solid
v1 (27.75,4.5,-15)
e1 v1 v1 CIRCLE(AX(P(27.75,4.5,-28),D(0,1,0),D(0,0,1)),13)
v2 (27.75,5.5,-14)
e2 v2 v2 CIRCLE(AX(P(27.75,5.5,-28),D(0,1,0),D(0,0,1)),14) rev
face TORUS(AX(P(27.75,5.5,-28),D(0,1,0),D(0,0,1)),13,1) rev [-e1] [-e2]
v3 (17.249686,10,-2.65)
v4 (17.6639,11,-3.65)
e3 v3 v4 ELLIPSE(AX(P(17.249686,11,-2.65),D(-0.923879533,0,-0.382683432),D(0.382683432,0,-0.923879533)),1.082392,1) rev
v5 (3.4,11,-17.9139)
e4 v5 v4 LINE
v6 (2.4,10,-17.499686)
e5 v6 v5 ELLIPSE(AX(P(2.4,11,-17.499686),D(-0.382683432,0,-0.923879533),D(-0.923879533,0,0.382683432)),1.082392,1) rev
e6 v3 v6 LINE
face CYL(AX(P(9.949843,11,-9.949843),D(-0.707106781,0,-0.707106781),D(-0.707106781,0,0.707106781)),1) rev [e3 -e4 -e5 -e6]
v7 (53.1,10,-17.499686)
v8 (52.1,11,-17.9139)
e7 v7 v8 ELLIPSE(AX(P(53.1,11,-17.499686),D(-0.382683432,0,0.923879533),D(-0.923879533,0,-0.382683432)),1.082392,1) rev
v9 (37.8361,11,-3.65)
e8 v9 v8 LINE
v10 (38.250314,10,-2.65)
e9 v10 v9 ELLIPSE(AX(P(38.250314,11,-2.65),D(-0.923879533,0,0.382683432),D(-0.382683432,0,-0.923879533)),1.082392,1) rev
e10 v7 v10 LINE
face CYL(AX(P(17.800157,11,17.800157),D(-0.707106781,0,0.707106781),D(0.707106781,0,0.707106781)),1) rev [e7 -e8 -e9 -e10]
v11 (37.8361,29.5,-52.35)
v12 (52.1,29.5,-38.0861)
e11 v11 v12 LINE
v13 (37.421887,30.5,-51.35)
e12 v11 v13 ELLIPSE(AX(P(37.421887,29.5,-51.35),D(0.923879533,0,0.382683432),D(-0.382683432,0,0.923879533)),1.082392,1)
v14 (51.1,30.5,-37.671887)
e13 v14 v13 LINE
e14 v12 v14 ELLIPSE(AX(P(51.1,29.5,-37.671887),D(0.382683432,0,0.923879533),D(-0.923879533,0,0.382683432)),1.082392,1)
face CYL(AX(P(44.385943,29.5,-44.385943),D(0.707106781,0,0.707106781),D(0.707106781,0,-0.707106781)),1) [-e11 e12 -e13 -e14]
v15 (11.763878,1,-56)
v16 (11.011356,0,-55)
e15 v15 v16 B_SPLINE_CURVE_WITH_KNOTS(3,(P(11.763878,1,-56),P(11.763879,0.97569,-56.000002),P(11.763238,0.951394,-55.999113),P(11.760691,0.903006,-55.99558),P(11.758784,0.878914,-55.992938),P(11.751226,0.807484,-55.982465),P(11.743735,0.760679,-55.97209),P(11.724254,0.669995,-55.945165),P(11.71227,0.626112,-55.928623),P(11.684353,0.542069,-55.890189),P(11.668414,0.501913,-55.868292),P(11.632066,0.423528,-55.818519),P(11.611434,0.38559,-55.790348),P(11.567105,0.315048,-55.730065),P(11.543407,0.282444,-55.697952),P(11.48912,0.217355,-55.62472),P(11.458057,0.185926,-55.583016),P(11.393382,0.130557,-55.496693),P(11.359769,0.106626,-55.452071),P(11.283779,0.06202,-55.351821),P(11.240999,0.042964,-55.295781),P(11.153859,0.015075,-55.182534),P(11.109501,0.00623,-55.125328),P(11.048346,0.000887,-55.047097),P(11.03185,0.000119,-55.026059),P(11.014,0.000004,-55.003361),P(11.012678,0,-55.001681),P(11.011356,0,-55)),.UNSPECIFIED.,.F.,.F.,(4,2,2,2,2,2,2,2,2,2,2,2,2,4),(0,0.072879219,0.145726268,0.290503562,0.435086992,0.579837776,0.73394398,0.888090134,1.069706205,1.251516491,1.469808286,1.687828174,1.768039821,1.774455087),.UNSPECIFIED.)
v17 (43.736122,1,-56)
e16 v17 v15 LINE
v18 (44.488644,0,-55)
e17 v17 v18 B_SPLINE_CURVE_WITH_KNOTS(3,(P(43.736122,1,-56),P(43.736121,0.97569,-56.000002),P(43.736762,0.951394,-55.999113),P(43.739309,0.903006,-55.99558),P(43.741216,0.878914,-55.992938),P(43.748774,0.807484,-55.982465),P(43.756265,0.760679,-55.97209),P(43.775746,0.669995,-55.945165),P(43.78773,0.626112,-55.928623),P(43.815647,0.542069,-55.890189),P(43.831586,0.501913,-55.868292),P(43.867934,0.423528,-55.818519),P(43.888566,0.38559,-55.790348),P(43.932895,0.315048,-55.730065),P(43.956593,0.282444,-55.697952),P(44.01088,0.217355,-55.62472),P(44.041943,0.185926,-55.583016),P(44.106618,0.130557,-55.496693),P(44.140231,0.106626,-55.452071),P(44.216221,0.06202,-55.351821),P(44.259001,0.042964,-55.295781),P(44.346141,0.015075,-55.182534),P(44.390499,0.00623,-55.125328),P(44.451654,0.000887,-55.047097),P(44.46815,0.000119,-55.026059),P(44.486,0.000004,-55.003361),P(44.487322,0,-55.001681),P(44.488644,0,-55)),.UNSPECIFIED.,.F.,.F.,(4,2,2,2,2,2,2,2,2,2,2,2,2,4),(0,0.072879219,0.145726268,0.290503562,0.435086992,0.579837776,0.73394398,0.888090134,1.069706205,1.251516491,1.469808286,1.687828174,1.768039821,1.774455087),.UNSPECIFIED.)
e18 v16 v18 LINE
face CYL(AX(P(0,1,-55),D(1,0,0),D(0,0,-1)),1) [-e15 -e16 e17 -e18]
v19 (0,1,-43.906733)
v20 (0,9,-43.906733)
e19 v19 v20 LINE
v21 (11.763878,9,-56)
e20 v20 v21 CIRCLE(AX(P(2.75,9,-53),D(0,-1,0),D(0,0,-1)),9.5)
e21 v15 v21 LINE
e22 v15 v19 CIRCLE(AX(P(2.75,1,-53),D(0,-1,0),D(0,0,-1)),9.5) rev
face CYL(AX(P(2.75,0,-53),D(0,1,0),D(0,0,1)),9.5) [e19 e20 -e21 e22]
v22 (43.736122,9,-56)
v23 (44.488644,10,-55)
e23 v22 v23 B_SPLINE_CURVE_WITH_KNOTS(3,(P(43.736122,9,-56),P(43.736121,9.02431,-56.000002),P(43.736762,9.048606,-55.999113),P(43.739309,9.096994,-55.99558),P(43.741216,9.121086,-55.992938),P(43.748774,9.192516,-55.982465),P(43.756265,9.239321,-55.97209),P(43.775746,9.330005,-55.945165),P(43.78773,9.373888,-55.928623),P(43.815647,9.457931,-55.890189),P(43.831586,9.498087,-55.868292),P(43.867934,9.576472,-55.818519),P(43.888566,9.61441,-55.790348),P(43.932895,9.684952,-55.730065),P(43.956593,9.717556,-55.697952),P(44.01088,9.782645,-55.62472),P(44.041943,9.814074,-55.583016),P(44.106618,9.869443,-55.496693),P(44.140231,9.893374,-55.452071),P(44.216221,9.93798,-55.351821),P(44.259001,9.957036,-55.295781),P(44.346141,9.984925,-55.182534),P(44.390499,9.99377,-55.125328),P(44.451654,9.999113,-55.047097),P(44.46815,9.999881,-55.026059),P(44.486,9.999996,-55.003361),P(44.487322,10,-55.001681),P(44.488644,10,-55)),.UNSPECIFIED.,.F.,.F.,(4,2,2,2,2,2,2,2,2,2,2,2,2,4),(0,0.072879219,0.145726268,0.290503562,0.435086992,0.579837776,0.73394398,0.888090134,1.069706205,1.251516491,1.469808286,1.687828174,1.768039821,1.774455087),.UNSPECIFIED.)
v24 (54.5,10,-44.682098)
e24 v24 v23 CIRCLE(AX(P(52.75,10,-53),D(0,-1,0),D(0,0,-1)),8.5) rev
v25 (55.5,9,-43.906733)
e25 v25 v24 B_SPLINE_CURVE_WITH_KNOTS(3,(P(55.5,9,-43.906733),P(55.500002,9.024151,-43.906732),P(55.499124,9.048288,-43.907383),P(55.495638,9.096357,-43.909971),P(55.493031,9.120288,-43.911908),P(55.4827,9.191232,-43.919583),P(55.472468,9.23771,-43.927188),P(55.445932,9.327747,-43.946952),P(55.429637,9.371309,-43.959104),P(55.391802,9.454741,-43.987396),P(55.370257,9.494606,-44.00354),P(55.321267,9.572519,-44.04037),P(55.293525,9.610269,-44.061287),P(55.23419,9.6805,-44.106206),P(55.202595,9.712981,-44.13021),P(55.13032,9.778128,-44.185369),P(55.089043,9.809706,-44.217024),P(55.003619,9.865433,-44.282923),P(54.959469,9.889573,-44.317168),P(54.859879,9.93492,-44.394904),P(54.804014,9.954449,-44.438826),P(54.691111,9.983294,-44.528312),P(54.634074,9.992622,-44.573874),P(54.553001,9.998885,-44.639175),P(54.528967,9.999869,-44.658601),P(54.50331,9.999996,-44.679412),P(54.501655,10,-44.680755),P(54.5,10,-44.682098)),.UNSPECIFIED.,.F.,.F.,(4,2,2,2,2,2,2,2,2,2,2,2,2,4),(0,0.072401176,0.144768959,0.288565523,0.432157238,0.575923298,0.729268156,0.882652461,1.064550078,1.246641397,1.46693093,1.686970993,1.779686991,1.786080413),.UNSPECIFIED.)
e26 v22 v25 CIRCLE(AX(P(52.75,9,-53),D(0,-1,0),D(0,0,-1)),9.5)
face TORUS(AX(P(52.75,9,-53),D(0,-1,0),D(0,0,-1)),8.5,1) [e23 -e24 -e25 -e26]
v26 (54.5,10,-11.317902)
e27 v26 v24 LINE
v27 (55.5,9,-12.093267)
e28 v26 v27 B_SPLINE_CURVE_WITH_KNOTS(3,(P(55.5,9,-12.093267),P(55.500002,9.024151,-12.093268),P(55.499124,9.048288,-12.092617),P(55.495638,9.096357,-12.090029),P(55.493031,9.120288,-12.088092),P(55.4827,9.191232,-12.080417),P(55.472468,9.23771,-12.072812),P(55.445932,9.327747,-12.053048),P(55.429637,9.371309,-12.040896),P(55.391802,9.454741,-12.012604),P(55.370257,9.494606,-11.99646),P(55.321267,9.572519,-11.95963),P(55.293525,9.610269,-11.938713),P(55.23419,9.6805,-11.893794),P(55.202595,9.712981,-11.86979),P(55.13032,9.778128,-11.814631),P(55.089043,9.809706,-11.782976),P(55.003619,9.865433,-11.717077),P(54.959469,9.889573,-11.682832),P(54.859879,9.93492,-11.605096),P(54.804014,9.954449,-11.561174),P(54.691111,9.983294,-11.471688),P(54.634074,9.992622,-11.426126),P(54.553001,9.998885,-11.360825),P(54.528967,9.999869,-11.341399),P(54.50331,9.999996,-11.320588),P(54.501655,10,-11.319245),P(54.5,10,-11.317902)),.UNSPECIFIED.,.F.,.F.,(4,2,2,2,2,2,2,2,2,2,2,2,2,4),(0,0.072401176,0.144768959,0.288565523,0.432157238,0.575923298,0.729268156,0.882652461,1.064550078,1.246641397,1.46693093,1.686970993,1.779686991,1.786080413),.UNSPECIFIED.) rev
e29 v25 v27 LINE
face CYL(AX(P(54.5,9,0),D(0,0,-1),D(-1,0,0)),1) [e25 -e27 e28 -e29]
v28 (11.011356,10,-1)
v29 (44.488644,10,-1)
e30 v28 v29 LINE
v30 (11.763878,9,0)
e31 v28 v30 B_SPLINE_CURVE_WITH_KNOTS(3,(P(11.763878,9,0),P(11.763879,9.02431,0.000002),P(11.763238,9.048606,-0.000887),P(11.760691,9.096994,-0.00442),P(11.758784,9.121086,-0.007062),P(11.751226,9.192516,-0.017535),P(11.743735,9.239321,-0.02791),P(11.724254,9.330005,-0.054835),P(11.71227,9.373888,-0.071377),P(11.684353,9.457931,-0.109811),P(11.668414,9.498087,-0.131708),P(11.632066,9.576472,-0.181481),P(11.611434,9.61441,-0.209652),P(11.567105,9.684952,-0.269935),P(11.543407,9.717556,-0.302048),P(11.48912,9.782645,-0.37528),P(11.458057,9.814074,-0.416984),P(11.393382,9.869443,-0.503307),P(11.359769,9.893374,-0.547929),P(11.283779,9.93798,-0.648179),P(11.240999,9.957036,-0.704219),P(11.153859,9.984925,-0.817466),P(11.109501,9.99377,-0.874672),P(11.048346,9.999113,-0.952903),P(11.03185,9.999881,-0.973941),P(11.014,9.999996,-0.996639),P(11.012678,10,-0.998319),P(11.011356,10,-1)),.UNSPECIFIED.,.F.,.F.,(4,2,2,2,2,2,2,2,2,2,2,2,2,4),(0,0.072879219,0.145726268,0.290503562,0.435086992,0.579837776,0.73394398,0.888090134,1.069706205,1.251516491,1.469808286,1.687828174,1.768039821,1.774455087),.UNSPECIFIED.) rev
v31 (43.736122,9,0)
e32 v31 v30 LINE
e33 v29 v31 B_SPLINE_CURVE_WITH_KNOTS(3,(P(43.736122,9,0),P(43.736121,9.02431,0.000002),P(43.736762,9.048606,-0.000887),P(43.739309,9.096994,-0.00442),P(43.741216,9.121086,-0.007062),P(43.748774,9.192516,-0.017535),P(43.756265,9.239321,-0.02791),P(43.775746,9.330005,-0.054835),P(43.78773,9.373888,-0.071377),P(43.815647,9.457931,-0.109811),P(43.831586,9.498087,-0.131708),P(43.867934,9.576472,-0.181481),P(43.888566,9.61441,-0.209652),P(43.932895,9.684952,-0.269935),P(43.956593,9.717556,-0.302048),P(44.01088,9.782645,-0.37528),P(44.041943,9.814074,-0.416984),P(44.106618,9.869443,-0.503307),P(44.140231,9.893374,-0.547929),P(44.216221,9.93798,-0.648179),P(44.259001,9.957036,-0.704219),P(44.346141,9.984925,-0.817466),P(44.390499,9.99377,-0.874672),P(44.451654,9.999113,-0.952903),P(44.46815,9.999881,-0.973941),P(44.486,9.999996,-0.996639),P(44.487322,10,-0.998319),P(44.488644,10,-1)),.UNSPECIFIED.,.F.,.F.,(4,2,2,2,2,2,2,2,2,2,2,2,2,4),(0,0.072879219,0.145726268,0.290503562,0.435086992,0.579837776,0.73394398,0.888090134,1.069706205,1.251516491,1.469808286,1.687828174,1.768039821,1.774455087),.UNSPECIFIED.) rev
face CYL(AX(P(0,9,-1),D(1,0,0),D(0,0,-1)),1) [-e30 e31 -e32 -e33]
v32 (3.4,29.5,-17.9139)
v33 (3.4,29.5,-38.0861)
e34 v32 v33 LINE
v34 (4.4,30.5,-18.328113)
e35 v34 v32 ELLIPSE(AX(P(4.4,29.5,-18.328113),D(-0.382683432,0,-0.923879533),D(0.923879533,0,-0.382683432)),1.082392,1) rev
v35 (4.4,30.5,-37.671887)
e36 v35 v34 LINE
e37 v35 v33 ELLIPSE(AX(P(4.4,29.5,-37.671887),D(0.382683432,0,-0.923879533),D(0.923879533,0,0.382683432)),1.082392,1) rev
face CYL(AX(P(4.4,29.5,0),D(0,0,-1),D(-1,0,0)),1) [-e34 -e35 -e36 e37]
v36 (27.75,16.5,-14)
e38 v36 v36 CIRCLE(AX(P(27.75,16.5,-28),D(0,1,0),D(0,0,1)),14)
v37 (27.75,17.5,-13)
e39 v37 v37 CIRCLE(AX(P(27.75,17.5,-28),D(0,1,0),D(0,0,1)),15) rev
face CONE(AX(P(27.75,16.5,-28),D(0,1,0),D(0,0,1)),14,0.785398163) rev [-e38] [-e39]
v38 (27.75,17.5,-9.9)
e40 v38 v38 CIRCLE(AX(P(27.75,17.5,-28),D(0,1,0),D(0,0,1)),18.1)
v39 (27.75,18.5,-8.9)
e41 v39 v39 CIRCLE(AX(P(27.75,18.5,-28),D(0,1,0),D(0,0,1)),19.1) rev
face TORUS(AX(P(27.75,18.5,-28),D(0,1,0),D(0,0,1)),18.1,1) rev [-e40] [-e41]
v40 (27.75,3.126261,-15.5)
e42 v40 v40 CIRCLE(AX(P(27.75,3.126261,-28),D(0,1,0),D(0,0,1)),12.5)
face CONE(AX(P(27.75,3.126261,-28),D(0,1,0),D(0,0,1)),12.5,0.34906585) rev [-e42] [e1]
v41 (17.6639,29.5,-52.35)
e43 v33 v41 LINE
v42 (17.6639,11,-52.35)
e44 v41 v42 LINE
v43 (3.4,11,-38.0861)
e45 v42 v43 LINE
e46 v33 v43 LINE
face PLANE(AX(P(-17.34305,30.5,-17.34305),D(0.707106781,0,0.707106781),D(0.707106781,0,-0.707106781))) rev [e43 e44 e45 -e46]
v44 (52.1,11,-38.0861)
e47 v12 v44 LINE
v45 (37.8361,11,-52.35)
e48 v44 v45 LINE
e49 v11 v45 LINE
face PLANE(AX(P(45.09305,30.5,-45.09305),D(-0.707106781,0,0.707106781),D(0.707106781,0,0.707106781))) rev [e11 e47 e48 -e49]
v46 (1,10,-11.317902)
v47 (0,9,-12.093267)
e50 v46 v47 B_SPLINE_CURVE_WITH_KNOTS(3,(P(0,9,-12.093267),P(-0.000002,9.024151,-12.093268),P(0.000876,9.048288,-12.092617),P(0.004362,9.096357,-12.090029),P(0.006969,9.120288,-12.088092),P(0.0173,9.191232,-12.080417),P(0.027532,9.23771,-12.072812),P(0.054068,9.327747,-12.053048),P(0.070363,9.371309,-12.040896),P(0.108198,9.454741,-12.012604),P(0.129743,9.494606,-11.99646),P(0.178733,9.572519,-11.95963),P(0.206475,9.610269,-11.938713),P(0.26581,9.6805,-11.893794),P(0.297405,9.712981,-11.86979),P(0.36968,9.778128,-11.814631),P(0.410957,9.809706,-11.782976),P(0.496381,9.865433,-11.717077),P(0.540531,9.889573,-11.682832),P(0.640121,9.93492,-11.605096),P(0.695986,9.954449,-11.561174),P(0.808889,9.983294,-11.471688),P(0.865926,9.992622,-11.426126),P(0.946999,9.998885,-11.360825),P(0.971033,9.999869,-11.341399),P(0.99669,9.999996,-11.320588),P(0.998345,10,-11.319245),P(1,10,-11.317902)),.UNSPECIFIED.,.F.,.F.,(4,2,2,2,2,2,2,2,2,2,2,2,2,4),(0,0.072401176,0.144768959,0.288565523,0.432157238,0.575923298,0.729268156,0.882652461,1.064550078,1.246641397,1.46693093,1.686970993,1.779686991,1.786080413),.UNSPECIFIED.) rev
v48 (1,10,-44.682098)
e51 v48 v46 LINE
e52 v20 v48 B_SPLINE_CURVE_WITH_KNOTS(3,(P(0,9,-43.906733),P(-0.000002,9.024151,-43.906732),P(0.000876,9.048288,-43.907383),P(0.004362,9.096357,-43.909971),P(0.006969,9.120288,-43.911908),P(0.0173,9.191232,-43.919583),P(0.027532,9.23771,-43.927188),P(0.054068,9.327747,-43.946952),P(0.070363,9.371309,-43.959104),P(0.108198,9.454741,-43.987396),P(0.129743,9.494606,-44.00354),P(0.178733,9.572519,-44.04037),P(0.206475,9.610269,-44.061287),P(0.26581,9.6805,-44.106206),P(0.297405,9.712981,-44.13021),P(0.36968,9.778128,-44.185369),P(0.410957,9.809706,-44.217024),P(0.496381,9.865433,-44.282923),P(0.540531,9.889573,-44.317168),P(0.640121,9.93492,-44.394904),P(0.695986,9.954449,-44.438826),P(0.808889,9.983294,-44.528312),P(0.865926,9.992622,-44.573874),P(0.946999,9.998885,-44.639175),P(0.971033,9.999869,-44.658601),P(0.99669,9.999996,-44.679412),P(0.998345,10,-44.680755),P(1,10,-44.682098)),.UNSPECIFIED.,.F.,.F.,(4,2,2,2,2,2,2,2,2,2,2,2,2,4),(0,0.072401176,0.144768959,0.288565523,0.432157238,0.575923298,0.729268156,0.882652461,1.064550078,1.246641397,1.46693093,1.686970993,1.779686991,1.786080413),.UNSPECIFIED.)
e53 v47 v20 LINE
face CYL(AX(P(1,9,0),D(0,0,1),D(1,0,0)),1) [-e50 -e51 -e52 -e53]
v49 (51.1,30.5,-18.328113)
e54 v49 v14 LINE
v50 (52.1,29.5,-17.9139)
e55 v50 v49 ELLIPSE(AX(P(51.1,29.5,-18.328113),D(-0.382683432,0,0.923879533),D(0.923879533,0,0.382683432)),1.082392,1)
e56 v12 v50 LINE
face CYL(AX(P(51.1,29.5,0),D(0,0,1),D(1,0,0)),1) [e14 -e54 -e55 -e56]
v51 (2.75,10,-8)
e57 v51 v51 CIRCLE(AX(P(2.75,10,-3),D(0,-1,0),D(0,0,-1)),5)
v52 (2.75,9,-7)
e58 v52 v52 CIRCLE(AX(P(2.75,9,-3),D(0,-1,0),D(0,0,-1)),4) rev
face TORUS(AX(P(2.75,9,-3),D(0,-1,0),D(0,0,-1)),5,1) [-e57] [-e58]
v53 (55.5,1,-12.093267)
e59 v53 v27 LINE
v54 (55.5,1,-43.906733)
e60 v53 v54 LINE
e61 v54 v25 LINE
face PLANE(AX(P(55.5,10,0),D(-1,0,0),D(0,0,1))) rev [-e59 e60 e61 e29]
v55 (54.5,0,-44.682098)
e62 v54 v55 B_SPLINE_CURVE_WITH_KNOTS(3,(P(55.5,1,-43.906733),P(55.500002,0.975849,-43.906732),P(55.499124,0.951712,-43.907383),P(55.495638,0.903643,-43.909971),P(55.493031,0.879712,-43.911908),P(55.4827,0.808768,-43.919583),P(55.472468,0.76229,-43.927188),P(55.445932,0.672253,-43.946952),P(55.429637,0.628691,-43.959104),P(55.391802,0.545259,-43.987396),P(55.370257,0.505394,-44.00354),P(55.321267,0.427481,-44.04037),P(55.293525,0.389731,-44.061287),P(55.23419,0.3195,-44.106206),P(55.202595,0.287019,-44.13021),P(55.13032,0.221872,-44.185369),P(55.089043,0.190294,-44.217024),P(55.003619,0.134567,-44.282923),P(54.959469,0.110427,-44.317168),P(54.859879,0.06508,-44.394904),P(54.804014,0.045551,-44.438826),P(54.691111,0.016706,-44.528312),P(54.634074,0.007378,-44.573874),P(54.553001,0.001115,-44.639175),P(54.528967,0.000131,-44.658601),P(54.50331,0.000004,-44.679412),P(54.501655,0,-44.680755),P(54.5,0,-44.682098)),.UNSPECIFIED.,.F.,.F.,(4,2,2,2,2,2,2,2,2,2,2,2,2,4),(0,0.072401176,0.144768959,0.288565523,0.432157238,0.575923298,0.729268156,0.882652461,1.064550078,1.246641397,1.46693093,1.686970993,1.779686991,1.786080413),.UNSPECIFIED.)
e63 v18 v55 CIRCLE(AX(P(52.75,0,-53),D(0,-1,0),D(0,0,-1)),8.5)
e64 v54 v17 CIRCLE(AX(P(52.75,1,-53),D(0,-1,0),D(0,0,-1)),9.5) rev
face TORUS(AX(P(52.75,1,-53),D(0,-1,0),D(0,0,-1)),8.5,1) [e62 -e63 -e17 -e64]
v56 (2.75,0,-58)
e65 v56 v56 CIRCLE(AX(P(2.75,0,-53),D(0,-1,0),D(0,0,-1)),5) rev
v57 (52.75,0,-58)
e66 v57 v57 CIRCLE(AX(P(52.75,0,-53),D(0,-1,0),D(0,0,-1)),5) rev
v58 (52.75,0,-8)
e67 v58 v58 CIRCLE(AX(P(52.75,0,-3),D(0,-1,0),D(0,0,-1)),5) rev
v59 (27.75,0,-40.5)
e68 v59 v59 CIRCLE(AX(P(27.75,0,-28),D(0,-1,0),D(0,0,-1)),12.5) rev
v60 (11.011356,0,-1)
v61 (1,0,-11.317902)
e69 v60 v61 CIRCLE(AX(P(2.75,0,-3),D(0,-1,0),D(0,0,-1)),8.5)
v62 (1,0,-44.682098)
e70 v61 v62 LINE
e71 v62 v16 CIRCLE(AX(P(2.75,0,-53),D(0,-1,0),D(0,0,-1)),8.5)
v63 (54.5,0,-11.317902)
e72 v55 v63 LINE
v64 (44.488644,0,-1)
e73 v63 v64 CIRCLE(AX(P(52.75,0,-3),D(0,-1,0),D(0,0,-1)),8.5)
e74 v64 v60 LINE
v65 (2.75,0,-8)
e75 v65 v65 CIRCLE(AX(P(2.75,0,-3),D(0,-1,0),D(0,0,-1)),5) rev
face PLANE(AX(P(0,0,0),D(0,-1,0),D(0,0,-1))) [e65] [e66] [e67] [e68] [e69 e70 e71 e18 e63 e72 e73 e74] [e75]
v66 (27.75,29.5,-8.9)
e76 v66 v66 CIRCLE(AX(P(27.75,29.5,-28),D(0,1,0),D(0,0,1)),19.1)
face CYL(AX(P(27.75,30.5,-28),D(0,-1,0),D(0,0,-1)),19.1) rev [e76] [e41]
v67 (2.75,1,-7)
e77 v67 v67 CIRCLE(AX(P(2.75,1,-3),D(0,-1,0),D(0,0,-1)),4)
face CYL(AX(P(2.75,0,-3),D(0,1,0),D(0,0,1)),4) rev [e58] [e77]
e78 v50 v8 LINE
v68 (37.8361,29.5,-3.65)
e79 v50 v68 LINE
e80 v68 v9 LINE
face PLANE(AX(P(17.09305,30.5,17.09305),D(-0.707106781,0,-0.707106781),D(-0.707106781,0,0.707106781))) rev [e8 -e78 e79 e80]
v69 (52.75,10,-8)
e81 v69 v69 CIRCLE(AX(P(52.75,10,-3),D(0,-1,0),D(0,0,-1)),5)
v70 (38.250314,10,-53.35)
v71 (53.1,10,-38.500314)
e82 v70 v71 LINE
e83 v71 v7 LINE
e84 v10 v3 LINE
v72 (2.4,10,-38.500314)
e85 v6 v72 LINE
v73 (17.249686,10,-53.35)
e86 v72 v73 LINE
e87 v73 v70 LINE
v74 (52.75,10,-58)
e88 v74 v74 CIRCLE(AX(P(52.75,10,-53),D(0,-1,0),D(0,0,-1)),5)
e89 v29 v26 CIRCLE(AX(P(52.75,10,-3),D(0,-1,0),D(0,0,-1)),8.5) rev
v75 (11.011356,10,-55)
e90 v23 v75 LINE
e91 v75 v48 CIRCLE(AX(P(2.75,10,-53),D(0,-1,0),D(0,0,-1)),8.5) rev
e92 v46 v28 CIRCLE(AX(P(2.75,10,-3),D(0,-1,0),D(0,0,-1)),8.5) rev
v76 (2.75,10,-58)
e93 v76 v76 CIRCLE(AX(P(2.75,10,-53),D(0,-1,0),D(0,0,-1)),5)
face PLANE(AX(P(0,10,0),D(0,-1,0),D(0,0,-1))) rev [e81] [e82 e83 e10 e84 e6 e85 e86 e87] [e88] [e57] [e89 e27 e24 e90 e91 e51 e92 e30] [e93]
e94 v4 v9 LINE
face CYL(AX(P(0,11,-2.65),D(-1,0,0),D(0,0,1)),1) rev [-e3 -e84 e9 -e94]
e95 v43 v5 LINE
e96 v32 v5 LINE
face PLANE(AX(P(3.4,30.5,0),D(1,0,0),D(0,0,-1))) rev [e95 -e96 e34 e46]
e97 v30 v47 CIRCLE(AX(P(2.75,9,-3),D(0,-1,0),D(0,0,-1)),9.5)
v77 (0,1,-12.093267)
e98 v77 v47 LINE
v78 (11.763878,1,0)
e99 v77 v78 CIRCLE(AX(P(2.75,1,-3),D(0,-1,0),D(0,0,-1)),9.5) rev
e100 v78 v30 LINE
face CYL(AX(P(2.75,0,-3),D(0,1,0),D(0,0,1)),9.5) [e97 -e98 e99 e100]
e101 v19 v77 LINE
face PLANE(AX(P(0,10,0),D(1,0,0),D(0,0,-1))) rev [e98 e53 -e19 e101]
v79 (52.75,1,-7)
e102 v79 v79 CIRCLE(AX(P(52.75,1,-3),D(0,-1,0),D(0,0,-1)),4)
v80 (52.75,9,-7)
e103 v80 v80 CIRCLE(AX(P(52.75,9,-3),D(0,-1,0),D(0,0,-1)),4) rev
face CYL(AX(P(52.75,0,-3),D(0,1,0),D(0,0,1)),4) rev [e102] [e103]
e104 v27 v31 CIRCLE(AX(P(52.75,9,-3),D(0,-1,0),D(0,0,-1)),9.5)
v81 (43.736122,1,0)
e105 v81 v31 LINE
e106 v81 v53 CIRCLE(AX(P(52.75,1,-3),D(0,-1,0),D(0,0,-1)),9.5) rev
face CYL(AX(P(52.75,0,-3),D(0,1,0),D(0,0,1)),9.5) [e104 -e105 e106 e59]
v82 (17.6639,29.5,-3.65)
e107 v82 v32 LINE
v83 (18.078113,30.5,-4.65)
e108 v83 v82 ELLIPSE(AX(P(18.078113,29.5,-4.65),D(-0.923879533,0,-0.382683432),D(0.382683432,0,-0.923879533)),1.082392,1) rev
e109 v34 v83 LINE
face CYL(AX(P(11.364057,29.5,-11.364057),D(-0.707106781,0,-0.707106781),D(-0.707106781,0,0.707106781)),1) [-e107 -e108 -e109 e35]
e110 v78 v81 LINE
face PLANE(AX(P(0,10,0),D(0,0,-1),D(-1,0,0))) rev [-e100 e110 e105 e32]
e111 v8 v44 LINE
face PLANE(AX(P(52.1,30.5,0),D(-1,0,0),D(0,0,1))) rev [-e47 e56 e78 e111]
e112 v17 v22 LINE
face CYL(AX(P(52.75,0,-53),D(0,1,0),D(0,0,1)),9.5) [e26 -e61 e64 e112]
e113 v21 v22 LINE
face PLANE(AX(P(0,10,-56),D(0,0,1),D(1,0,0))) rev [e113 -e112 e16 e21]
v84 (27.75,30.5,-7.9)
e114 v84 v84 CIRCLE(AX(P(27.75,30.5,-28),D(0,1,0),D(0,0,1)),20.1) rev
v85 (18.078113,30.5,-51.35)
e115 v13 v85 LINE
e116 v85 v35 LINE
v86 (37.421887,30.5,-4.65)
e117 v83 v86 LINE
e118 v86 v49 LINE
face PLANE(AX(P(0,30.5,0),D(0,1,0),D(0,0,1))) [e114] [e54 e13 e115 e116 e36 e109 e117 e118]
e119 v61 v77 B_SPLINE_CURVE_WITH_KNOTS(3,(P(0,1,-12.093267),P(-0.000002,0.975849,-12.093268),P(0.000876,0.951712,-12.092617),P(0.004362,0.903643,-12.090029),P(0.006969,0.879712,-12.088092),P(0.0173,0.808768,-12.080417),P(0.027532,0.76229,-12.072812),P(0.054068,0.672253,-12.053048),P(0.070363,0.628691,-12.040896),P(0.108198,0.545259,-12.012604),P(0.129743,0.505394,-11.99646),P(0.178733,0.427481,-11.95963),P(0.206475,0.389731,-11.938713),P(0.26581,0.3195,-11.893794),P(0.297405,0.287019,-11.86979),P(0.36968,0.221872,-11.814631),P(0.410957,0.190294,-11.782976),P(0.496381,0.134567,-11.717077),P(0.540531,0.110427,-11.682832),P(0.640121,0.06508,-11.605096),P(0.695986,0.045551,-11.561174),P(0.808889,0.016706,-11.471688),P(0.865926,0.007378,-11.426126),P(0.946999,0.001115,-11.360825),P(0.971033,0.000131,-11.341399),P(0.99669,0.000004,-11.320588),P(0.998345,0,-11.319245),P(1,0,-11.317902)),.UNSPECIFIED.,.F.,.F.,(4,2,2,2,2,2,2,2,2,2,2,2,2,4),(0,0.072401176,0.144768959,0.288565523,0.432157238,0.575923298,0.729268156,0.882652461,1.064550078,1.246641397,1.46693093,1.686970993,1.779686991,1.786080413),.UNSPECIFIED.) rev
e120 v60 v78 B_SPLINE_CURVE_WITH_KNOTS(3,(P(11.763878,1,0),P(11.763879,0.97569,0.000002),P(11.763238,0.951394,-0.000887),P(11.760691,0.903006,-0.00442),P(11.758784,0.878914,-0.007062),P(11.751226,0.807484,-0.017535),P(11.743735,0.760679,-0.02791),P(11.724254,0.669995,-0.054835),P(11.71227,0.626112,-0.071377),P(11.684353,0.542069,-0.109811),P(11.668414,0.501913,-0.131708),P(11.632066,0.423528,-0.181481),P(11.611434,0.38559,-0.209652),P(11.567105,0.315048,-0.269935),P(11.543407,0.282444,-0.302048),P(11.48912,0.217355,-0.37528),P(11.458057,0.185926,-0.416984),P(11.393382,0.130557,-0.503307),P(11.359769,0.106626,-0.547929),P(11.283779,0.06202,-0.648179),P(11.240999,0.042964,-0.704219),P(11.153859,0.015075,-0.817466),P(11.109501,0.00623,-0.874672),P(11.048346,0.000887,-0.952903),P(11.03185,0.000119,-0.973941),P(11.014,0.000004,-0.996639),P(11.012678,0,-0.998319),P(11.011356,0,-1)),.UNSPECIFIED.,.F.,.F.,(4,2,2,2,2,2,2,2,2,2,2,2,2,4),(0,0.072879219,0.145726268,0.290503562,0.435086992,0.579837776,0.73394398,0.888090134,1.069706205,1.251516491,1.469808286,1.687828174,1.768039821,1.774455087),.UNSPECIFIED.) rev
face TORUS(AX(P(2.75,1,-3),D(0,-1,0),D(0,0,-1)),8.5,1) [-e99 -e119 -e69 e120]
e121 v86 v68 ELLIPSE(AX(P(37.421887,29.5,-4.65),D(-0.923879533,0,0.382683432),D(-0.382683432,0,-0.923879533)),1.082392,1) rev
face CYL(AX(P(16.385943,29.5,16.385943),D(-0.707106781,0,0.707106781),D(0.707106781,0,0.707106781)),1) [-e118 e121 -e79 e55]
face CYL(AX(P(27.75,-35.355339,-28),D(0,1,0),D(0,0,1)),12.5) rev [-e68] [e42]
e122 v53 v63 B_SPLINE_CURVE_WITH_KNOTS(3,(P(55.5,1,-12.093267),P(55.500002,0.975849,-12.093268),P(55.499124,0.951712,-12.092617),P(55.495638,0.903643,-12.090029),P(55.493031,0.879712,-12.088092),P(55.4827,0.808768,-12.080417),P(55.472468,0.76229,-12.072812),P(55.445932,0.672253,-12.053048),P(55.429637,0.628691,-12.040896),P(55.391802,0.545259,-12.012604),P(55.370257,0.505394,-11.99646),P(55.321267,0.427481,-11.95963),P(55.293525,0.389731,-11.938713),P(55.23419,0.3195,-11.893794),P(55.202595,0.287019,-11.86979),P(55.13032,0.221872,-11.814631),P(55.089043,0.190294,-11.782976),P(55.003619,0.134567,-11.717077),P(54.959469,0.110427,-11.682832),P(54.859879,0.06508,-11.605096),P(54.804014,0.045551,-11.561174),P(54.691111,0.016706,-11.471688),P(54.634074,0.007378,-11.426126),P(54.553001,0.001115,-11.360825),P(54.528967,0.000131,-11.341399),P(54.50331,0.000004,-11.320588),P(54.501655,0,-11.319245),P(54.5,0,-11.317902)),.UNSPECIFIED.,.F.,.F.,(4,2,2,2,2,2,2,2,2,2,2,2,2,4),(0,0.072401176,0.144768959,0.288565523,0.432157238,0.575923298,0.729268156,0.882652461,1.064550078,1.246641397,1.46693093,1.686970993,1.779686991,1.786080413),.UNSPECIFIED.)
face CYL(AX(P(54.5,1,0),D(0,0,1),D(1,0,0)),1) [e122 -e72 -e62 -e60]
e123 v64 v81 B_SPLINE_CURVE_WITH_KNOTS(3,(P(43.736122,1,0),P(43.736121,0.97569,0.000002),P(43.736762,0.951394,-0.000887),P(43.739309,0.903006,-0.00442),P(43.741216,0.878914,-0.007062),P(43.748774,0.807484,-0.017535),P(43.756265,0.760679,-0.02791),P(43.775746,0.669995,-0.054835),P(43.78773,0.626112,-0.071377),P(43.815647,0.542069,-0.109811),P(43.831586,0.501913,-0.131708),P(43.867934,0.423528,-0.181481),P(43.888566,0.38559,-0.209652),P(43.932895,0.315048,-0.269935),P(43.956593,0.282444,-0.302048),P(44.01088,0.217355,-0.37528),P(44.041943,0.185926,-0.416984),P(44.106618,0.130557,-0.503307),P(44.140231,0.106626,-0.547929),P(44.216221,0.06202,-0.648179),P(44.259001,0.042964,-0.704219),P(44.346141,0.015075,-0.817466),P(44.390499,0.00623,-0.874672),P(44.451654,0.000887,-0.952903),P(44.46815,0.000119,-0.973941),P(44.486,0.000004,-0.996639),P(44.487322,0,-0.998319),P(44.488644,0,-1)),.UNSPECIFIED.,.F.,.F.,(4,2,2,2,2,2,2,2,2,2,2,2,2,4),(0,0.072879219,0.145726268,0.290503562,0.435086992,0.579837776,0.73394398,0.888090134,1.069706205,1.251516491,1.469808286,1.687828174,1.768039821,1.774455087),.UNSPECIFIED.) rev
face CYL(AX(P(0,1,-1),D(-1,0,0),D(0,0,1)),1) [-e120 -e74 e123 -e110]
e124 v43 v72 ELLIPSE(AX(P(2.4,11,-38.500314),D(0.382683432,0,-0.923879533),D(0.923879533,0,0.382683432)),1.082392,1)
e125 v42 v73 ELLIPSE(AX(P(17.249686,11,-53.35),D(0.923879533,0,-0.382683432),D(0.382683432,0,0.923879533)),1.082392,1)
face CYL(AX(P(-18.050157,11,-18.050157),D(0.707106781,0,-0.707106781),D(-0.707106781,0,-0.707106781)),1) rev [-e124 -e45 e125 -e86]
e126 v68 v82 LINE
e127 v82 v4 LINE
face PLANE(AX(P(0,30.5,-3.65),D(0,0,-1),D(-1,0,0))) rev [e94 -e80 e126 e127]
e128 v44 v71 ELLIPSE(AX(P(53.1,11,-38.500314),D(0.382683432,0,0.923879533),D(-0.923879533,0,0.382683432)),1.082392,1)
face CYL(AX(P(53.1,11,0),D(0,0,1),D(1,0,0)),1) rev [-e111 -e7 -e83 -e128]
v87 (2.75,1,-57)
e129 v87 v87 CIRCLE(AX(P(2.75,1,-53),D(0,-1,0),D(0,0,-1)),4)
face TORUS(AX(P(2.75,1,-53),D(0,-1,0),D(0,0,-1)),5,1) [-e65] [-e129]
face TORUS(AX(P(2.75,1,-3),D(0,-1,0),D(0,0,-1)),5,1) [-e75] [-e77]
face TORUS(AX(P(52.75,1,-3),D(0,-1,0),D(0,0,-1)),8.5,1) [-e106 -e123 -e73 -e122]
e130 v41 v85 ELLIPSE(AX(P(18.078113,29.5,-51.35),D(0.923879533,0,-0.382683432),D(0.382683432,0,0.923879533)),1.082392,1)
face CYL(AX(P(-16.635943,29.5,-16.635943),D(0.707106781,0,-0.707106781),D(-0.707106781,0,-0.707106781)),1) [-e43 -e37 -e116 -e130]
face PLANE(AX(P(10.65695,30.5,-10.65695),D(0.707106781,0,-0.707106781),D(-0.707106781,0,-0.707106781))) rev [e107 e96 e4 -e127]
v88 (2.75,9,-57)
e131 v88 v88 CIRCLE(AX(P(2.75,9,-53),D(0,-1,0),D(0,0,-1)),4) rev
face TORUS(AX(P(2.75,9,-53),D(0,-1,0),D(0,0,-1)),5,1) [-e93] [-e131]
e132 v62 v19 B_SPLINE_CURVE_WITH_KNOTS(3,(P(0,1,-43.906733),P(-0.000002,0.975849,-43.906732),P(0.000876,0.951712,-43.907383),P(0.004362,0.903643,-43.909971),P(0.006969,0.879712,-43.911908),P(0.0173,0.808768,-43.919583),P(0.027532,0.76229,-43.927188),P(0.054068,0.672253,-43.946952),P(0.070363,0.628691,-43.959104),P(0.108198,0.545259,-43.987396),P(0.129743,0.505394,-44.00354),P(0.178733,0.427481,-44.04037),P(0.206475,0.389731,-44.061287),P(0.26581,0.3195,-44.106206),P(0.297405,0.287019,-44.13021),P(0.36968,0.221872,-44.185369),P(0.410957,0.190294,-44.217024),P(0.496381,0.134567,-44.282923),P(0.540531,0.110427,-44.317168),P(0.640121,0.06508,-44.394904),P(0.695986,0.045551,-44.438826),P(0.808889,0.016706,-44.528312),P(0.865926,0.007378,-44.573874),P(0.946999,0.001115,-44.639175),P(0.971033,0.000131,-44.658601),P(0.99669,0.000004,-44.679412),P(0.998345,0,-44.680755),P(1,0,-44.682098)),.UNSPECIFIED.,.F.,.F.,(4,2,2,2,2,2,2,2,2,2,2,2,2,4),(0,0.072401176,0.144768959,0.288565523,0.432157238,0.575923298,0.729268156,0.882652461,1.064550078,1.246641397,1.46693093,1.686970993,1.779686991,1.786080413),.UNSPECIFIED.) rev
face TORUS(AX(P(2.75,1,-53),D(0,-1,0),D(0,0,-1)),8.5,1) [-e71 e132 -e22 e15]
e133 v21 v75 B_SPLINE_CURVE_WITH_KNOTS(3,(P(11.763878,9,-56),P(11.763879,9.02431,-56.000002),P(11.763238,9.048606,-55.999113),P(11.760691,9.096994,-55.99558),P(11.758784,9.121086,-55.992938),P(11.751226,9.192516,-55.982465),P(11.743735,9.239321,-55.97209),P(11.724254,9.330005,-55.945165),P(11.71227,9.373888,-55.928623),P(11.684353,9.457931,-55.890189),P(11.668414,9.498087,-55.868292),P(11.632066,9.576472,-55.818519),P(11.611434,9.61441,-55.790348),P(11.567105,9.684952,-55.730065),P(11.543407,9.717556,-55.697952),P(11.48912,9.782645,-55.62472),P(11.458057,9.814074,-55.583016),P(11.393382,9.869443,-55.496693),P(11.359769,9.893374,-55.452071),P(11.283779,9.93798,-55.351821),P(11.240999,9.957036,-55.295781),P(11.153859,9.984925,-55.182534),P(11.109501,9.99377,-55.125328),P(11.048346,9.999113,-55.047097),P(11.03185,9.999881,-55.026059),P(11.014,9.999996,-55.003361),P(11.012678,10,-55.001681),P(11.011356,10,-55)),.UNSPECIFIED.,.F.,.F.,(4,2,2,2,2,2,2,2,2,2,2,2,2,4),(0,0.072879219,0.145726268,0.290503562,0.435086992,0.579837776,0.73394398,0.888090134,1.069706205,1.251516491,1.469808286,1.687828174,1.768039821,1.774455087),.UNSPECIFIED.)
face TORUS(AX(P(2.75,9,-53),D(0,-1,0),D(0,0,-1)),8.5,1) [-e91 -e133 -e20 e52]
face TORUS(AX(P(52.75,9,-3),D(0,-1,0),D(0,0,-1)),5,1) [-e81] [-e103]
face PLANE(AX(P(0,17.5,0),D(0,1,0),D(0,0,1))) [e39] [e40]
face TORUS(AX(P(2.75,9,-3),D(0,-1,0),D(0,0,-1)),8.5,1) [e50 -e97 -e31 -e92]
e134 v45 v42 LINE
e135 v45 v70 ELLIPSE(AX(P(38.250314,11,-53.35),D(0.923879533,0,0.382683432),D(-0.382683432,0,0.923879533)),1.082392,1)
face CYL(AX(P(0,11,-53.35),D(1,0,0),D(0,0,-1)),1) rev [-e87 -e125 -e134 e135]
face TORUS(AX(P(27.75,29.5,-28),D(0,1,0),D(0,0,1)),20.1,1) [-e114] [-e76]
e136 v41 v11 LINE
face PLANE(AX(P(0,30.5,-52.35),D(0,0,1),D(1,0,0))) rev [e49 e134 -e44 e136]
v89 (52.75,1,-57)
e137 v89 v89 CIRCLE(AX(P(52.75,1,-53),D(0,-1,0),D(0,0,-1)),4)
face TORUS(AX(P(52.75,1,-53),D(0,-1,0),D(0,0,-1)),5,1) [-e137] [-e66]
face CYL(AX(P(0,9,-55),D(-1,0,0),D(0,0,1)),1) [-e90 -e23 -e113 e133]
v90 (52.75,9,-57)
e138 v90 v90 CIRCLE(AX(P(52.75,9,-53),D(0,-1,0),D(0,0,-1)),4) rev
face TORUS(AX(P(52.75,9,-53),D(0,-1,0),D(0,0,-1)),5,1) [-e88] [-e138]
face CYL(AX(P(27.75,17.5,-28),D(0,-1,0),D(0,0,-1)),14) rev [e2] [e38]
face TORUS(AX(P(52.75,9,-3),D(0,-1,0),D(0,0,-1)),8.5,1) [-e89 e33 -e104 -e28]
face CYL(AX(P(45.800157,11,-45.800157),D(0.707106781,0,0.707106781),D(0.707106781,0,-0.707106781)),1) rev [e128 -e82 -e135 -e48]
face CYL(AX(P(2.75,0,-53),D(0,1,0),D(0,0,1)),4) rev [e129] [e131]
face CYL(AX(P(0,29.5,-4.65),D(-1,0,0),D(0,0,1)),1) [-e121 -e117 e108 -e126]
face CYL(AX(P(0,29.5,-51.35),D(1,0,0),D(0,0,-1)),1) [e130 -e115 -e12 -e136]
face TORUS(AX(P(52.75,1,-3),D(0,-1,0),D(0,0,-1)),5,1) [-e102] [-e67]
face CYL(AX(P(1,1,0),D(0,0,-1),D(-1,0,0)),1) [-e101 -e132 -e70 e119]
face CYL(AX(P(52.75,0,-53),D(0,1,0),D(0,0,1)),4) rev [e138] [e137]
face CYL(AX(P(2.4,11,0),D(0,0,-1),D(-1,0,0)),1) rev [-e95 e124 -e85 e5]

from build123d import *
from build123d.topology import SkipClean

# Parameters (mm, degrees)
SKETCH1_W           = 55.5
SKETCH1_H           = 56
BOSS_EXTRUDE1_DEPTH = 10
BOSS_EXTRUDE2_DEPTH = 10
SKETCH2_3_R         = 4
CUT_EXTRUDE1_DEPTH  = 10
FILLET1_R           = 1
SKETCH3_R           = 19.1
BOSS_EXTRUDE3_DEPTH = 20.5
SKETCH3_3_R         = 19.1
SKETCH3_3_R_2       = 14
BOSS_EXTRUDE4_DEPTH = 7.5
CUT_EXTRUDE2_START  = -5.5
SKETCH3_4_R         = 14
CUT_EXTRUDE2_DEPTH  = 5.5
SKETCH3_5_R         = 12.5
CUT_EXTRUDE3_DEPTH  = 10
CHAMFER1_SIZE       = 1
FILLET2_R           = 1
FILLET3_R           = 1
FILLET4_R           = 1
FILLET5_R           = 1
CHAMFER2_SIZE2      = 1.37373871
CHAMFER2_SIZE       = 0.5


with BuildPart() as part:
    # Sketch1 → Boss-Extrude1 (new body)
    with BuildSketch(Plane(origin=(0, 0, 0), x_dir=(1, 0, 0), z_dir=(0, 1, 0))):
        with Locations((27.75, 28)):
            Rectangle(SKETCH1_W, SKETCH1_H)
    extrude(amount=BOSS_EXTRUDE1_DEPTH)

    # Sketch2 → Boss-Extrude2 (add)
    with BuildSketch(Plane(origin=(0, 10, 0), x_dir=(1, 0, 0), z_dir=(0, 1, 0))):
        with BuildLine():
            Line((0, 50.09526249), (0, 43.90673326))
            ThreePointArc((0, 43.90673326), (8.412375826, 45.371926849), (12.25, 53))
            ThreePointArc((12.25, 53), (12.127682091, 54.519565268), (11.763878189, 56))
            Line((11.763878189, 56), (5.395751311, 56))
            ThreePointArc((5.395751311, 56), (6.395751311, 54.645751311), (6.75, 53))
            ThreePointArc((6.75, 53), (4.33113883, 49.325765386), (0, 50.09526249))
        make_face()
        with BuildLine():
            ThreePointArc((11.763878189, 56), (-4.059612148, 59.624136351), (0, 43.90673326))
            Line((0, 43.90673326), (0, 50.09526249))
            ThreePointArc((0, 50.09526249), (-1.25, 53), (0, 55.90473751))
            Line((0, 55.90473751), (0, 56))
            Line((0, 56), (0.104248689, 56))
            ThreePointArc((0.104248689, 56), (2.75, 57), (5.395751311, 56))
            Line((5.395751311, 56), (11.763878189, 56))
        make_face()
        with BuildLine():
            ThreePointArc((11.763878189, 0), (12.127682091, 1.480434732), (12.25, 3))
            ThreePointArc((12.25, 3), (8.412375826, 10.628073151), (0, 12.09326674))
            Line((0, 12.09326674), (0, 5.90473751))
            ThreePointArc((0, 5.90473751), (4.33113883, 6.674234614), (6.75, 3))
            ThreePointArc((6.75, 3), (6.395751311, 1.354248689), (5.395751311, 0))
            Line((5.395751311, 0), (11.763878189, 0))
        make_face()
        with BuildLine():
            Line((0, 5.90473751), (0, 12.09326674))
            ThreePointArc((0, 12.09326674), (-4.059612148, -3.624136351), (11.763878189, 0))
            Line((11.763878189, 0), (5.395751311, 0))
            ThreePointArc((5.395751311, 0), (2.75, -1), (0.104248689, 0))
            Line((0.104248689, 0), (0, 0))
            Line((0, 0), (0, 0.09526249))
            ThreePointArc((0, 0.09526249), (-1.25, 3), (0, 5.90473751))
        make_face()
        with BuildLine():
            Line((50.104248689, 0), (43.736121811, 0))
            ThreePointArc((43.736121811, 0), (54.269565268, -6.377682091), (62.25, 3))
            ThreePointArc((62.25, 3), (60.378073151, 8.662375826), (55.5, 12.09326674))
            Line((55.5, 12.09326674), (55.5, 5.90473751))
            ThreePointArc((55.5, 5.90473751), (56.424234614, 4.58113883), (56.75, 3))
            ThreePointArc((56.75, 3), (56.424234614, 1.41886117), (55.5, 0.09526249))
            Line((55.5, 0.09526249), (55.5, 0))
            Line((55.5, 0), (55.395751311, 0))
            ThreePointArc((55.395751311, 0), (52.75, -1), (50.104248689, 0))
        make_face()
        with BuildLine():
            ThreePointArc((55.5, 12.09326674), (45.940387852, 9.624136351), (43.736121811, 0))
            Line((43.736121811, 0), (50.104248689, 0))
            ThreePointArc((50.104248689, 0), (49.797171151, 5.69829609), (55.5, 5.90473751))
            Line((55.5, 5.90473751), (55.5, 12.09326674))
        make_face()
        with BuildLine():
            Line((50.104248689, 56), (43.736121811, 56))
            ThreePointArc((43.736121811, 56), (45.940387852, 46.375863649), (55.5, 43.90673326))
            Line((55.5, 43.90673326), (55.5, 50.09526249))
            ThreePointArc((55.5, 50.09526249), (49.797171151, 50.30170391), (50.104248689, 56))
        make_face()
        with BuildLine():
            ThreePointArc((62.25, 53), (54.269565268, 62.377682091), (43.736121811, 56))
            Line((43.736121811, 56), (50.104248689, 56))
            ThreePointArc((50.104248689, 56), (52.75, 57), (55.395751311, 56))
            Line((55.395751311, 56), (55.5, 56))
            Line((55.5, 56), (55.5, 55.90473751))
            ThreePointArc((55.5, 55.90473751), (56.424234614, 54.58113883), (56.75, 53))
            ThreePointArc((56.75, 53), (56.424234614, 51.41886117), (55.5, 50.09526249))
            Line((55.5, 50.09526249), (55.5, 43.90673326))
            ThreePointArc((55.5, 43.90673326), (60.378073151, 47.337624174), (62.25, 53))
        make_face()
    extrude(amount=-BOSS_EXTRUDE2_DEPTH)

    # Sketch2<3> → Cut-Extrude1 (cut)
    with SkipClean():  # the faces are left unmerged after this step: merging them gives an invalid solid
        with BuildSketch(Plane(origin=(0, 10, 0), x_dir=(1, 0, 0), z_dir=(0, 1, 0))):
            with Locations(Location((2.75, 3, 0), (0, 0, 270))):
                Circle(SKETCH2_3_R)
            with Locations(Location((52.75, 3, 0), (0, 0, 270))):
                Circle(SKETCH2_3_R)
            with Locations(Location((52.75, 53, 0), (0, 0, 270))):
                Circle(SKETCH2_3_R)
            with Locations(Location((2.75, 53, 0), (0, 0, 270))):
                Circle(SKETCH2_3_R)
        extrude(amount=-CUT_EXTRUDE1_DEPTH, mode=Mode.SUBTRACT)

    # Fillet1
    fillet1_edges = [part.edges().sort_by_distance(p)[0] for p in [
        (0, 0, -28),
        (0, 10, -28),
        (1.269957777, 10, -49.2838898),
        (-4.059612148, 0, -59.624136351),
        (1.269957777, 0, -49.2838898),
        (-4.059612148, 10, -59.624136351),
        (27.75, 0, 0),
        (27.75, 10, 0),
        (1.335786438, 10, 0.741657387),
        (-4.059612148, 0, 3.624136351),
        (1.335786438, 0, 0.741657387),
        (-4.059612148, 10, 3.624136351),
        (55.5, 0, -28),
        (55.5, 10, -28),
        (51.335786438, 10, 0.741657387),
        (59.559612148, 0, 3.624136351),
        (51.335786438, 0, 0.741657387),
        (59.559612148, 10, 3.624136351),
        (27.75, 0, -56),
        (27.75, 10, -56),
        (49.008342613, 10, -51.585786438),
        (59.559612148, 0, -59.624136351),
        (49.008342613, 0, -51.585786438),
        (59.559612148, 10, -59.624136351),
    ]]
    fillet(fillet1_edges, radius=FILLET1_R)

    # Sketch3 → Boss-Extrude3 (add)
    with SkipClean():  # the faces are left unmerged after this step: merging them gives an invalid solid
        with BuildSketch(Plane(origin=(0, 10, 0), x_dir=(1, 0, 0), z_dir=(0, 1, 0))):
            Polygon((52.1, 17.913899756), (52.1, 38.086100244), (37.836100244, 52.35), (17.663899756, 52.35), (3.4, 38.086100244), (3.4, 17.913899756), (17.663899756, 3.65), (37.836100244, 3.65), align=None)
            with Locations(Location((27.75, 28, 0), (0, 0, 270))):
                Circle(SKETCH3_R, mode=Mode.SUBTRACT)
        extrude(amount=BOSS_EXTRUDE3_DEPTH)

    # Sketch3<3> → Boss-Extrude4 (add)
    with SkipClean():  # the faces are left unmerged after this step: merging them gives an invalid solid
        with BuildSketch(Plane(origin=(0, 10, 0), x_dir=(1, 0, 0), z_dir=(0, 1, 0))):
            with Locations(Location((27.75, 28, 0), (0, 0, 270))):
                Circle(SKETCH3_3_R)
            with Locations(Location((27.75, 28, 0), (0, 0, 270))):
                Circle(SKETCH3_3_R_2, mode=Mode.SUBTRACT)
        extrude(amount=BOSS_EXTRUDE4_DEPTH)

    # Sketch3<4> → Cut-Extrude2 (cut)
    with SkipClean():  # the faces are left unmerged after this step: merging them gives an invalid solid
        with BuildSketch(Plane(origin=(0, 10, 0), x_dir=(1, 0, 0), z_dir=(0, 1, 0)).offset(CUT_EXTRUDE2_START)):
            with Locations(Location((27.75, 28, 0), (0, 0, 270))):
                Circle(SKETCH3_4_R)
        extrude(amount=CUT_EXTRUDE2_DEPTH, mode=Mode.SUBTRACT)

    # Sketch3<5> → Cut-Extrude3 (cut)
    with SkipClean():  # the faces are left unmerged after this step: merging them gives an invalid solid
        with BuildSketch(Plane(origin=(0, 10, 0), x_dir=(1, 0, 0), z_dir=(0, 1, 0))):
            with Locations(Location((27.75, 28, 0), (0, 0, 270))):
                Circle(SKETCH3_5_R)
        extrude(amount=-CUT_EXTRUDE3_DEPTH, mode=Mode.SUBTRACT)

    # Chamfer1
    chamfer1_edges = [part.edges().sort_by_distance(p)[0] for p in [
        (27.75, 17.5, -42),
    ]]
    chamfer(chamfer1_edges, length=CHAMFER1_SIZE)

    # Fillet2
    fillet2_edges = [part.edges().sort_by_distance(p)[0] for p in [
        (52.1, 10, -28),
        (44.968050122, 10, -45.218050122),
        (27.75, 10, -52.35),
        (10.531949878, 10, -45.218050122),
        (3.4, 10, -28),
        (10.531949878, 10, -10.781949878),
        (27.75, 10, -3.65),
        (44.968050122, 10, -10.781949878),
    ]]
    fillet(fillet2_edges, radius=FILLET2_R)

    # Fillet3
    fillet3_edges = [part.edges().sort_by_distance(p)[0] for p in [
        (27.75, 30.5, -47.1),
        (52.1, 30.5, -28),
        (44.968050122, 30.5, -45.218050122),
        (27.75, 30.5, -52.35),
        (10.531949878, 30.5, -45.218050122),
        (3.4, 30.5, -28),
        (10.531949878, 30.5, -10.781949878),
        (27.75, 30.5, -3.65),
        (44.968050122, 30.5, -10.781949878),
    ]]
    fillet(fillet3_edges, radius=FILLET3_R)

    # Fillet4
    fillet4_edges = [part.edges().sort_by_distance(p)[0] for p in [
        (27.75, 17.5, -47.1),
    ]]
    fillet(fillet4_edges, radius=FILLET4_R)

    # Fillet5
    fillet5_edges = [part.edges().sort_by_distance(p)[0] for p in [
        (27.75, 4.5, -42),
    ]]
    fillet(fillet5_edges, radius=FILLET5_R)

    # Chamfer2
    chamfer2_edges = [part.edges().sort_by_distance(p)[0] for p in [
        (27.75, 4.5, -40.5),
    ]]
    chamfer2_side = [part.faces().sort_by_distance(p)[0] for p in [
        (27.75, 4.5, -40.51),
    ]]
    chamfer(chamfer2_edges, length=CHAMFER2_SIZE - 0.0001, length2=CHAMFER2_SIZE2 - 0.0001, reference=chamfer2_side[0])  # a hair under: the kernel refuses the full size


solid = part.part
